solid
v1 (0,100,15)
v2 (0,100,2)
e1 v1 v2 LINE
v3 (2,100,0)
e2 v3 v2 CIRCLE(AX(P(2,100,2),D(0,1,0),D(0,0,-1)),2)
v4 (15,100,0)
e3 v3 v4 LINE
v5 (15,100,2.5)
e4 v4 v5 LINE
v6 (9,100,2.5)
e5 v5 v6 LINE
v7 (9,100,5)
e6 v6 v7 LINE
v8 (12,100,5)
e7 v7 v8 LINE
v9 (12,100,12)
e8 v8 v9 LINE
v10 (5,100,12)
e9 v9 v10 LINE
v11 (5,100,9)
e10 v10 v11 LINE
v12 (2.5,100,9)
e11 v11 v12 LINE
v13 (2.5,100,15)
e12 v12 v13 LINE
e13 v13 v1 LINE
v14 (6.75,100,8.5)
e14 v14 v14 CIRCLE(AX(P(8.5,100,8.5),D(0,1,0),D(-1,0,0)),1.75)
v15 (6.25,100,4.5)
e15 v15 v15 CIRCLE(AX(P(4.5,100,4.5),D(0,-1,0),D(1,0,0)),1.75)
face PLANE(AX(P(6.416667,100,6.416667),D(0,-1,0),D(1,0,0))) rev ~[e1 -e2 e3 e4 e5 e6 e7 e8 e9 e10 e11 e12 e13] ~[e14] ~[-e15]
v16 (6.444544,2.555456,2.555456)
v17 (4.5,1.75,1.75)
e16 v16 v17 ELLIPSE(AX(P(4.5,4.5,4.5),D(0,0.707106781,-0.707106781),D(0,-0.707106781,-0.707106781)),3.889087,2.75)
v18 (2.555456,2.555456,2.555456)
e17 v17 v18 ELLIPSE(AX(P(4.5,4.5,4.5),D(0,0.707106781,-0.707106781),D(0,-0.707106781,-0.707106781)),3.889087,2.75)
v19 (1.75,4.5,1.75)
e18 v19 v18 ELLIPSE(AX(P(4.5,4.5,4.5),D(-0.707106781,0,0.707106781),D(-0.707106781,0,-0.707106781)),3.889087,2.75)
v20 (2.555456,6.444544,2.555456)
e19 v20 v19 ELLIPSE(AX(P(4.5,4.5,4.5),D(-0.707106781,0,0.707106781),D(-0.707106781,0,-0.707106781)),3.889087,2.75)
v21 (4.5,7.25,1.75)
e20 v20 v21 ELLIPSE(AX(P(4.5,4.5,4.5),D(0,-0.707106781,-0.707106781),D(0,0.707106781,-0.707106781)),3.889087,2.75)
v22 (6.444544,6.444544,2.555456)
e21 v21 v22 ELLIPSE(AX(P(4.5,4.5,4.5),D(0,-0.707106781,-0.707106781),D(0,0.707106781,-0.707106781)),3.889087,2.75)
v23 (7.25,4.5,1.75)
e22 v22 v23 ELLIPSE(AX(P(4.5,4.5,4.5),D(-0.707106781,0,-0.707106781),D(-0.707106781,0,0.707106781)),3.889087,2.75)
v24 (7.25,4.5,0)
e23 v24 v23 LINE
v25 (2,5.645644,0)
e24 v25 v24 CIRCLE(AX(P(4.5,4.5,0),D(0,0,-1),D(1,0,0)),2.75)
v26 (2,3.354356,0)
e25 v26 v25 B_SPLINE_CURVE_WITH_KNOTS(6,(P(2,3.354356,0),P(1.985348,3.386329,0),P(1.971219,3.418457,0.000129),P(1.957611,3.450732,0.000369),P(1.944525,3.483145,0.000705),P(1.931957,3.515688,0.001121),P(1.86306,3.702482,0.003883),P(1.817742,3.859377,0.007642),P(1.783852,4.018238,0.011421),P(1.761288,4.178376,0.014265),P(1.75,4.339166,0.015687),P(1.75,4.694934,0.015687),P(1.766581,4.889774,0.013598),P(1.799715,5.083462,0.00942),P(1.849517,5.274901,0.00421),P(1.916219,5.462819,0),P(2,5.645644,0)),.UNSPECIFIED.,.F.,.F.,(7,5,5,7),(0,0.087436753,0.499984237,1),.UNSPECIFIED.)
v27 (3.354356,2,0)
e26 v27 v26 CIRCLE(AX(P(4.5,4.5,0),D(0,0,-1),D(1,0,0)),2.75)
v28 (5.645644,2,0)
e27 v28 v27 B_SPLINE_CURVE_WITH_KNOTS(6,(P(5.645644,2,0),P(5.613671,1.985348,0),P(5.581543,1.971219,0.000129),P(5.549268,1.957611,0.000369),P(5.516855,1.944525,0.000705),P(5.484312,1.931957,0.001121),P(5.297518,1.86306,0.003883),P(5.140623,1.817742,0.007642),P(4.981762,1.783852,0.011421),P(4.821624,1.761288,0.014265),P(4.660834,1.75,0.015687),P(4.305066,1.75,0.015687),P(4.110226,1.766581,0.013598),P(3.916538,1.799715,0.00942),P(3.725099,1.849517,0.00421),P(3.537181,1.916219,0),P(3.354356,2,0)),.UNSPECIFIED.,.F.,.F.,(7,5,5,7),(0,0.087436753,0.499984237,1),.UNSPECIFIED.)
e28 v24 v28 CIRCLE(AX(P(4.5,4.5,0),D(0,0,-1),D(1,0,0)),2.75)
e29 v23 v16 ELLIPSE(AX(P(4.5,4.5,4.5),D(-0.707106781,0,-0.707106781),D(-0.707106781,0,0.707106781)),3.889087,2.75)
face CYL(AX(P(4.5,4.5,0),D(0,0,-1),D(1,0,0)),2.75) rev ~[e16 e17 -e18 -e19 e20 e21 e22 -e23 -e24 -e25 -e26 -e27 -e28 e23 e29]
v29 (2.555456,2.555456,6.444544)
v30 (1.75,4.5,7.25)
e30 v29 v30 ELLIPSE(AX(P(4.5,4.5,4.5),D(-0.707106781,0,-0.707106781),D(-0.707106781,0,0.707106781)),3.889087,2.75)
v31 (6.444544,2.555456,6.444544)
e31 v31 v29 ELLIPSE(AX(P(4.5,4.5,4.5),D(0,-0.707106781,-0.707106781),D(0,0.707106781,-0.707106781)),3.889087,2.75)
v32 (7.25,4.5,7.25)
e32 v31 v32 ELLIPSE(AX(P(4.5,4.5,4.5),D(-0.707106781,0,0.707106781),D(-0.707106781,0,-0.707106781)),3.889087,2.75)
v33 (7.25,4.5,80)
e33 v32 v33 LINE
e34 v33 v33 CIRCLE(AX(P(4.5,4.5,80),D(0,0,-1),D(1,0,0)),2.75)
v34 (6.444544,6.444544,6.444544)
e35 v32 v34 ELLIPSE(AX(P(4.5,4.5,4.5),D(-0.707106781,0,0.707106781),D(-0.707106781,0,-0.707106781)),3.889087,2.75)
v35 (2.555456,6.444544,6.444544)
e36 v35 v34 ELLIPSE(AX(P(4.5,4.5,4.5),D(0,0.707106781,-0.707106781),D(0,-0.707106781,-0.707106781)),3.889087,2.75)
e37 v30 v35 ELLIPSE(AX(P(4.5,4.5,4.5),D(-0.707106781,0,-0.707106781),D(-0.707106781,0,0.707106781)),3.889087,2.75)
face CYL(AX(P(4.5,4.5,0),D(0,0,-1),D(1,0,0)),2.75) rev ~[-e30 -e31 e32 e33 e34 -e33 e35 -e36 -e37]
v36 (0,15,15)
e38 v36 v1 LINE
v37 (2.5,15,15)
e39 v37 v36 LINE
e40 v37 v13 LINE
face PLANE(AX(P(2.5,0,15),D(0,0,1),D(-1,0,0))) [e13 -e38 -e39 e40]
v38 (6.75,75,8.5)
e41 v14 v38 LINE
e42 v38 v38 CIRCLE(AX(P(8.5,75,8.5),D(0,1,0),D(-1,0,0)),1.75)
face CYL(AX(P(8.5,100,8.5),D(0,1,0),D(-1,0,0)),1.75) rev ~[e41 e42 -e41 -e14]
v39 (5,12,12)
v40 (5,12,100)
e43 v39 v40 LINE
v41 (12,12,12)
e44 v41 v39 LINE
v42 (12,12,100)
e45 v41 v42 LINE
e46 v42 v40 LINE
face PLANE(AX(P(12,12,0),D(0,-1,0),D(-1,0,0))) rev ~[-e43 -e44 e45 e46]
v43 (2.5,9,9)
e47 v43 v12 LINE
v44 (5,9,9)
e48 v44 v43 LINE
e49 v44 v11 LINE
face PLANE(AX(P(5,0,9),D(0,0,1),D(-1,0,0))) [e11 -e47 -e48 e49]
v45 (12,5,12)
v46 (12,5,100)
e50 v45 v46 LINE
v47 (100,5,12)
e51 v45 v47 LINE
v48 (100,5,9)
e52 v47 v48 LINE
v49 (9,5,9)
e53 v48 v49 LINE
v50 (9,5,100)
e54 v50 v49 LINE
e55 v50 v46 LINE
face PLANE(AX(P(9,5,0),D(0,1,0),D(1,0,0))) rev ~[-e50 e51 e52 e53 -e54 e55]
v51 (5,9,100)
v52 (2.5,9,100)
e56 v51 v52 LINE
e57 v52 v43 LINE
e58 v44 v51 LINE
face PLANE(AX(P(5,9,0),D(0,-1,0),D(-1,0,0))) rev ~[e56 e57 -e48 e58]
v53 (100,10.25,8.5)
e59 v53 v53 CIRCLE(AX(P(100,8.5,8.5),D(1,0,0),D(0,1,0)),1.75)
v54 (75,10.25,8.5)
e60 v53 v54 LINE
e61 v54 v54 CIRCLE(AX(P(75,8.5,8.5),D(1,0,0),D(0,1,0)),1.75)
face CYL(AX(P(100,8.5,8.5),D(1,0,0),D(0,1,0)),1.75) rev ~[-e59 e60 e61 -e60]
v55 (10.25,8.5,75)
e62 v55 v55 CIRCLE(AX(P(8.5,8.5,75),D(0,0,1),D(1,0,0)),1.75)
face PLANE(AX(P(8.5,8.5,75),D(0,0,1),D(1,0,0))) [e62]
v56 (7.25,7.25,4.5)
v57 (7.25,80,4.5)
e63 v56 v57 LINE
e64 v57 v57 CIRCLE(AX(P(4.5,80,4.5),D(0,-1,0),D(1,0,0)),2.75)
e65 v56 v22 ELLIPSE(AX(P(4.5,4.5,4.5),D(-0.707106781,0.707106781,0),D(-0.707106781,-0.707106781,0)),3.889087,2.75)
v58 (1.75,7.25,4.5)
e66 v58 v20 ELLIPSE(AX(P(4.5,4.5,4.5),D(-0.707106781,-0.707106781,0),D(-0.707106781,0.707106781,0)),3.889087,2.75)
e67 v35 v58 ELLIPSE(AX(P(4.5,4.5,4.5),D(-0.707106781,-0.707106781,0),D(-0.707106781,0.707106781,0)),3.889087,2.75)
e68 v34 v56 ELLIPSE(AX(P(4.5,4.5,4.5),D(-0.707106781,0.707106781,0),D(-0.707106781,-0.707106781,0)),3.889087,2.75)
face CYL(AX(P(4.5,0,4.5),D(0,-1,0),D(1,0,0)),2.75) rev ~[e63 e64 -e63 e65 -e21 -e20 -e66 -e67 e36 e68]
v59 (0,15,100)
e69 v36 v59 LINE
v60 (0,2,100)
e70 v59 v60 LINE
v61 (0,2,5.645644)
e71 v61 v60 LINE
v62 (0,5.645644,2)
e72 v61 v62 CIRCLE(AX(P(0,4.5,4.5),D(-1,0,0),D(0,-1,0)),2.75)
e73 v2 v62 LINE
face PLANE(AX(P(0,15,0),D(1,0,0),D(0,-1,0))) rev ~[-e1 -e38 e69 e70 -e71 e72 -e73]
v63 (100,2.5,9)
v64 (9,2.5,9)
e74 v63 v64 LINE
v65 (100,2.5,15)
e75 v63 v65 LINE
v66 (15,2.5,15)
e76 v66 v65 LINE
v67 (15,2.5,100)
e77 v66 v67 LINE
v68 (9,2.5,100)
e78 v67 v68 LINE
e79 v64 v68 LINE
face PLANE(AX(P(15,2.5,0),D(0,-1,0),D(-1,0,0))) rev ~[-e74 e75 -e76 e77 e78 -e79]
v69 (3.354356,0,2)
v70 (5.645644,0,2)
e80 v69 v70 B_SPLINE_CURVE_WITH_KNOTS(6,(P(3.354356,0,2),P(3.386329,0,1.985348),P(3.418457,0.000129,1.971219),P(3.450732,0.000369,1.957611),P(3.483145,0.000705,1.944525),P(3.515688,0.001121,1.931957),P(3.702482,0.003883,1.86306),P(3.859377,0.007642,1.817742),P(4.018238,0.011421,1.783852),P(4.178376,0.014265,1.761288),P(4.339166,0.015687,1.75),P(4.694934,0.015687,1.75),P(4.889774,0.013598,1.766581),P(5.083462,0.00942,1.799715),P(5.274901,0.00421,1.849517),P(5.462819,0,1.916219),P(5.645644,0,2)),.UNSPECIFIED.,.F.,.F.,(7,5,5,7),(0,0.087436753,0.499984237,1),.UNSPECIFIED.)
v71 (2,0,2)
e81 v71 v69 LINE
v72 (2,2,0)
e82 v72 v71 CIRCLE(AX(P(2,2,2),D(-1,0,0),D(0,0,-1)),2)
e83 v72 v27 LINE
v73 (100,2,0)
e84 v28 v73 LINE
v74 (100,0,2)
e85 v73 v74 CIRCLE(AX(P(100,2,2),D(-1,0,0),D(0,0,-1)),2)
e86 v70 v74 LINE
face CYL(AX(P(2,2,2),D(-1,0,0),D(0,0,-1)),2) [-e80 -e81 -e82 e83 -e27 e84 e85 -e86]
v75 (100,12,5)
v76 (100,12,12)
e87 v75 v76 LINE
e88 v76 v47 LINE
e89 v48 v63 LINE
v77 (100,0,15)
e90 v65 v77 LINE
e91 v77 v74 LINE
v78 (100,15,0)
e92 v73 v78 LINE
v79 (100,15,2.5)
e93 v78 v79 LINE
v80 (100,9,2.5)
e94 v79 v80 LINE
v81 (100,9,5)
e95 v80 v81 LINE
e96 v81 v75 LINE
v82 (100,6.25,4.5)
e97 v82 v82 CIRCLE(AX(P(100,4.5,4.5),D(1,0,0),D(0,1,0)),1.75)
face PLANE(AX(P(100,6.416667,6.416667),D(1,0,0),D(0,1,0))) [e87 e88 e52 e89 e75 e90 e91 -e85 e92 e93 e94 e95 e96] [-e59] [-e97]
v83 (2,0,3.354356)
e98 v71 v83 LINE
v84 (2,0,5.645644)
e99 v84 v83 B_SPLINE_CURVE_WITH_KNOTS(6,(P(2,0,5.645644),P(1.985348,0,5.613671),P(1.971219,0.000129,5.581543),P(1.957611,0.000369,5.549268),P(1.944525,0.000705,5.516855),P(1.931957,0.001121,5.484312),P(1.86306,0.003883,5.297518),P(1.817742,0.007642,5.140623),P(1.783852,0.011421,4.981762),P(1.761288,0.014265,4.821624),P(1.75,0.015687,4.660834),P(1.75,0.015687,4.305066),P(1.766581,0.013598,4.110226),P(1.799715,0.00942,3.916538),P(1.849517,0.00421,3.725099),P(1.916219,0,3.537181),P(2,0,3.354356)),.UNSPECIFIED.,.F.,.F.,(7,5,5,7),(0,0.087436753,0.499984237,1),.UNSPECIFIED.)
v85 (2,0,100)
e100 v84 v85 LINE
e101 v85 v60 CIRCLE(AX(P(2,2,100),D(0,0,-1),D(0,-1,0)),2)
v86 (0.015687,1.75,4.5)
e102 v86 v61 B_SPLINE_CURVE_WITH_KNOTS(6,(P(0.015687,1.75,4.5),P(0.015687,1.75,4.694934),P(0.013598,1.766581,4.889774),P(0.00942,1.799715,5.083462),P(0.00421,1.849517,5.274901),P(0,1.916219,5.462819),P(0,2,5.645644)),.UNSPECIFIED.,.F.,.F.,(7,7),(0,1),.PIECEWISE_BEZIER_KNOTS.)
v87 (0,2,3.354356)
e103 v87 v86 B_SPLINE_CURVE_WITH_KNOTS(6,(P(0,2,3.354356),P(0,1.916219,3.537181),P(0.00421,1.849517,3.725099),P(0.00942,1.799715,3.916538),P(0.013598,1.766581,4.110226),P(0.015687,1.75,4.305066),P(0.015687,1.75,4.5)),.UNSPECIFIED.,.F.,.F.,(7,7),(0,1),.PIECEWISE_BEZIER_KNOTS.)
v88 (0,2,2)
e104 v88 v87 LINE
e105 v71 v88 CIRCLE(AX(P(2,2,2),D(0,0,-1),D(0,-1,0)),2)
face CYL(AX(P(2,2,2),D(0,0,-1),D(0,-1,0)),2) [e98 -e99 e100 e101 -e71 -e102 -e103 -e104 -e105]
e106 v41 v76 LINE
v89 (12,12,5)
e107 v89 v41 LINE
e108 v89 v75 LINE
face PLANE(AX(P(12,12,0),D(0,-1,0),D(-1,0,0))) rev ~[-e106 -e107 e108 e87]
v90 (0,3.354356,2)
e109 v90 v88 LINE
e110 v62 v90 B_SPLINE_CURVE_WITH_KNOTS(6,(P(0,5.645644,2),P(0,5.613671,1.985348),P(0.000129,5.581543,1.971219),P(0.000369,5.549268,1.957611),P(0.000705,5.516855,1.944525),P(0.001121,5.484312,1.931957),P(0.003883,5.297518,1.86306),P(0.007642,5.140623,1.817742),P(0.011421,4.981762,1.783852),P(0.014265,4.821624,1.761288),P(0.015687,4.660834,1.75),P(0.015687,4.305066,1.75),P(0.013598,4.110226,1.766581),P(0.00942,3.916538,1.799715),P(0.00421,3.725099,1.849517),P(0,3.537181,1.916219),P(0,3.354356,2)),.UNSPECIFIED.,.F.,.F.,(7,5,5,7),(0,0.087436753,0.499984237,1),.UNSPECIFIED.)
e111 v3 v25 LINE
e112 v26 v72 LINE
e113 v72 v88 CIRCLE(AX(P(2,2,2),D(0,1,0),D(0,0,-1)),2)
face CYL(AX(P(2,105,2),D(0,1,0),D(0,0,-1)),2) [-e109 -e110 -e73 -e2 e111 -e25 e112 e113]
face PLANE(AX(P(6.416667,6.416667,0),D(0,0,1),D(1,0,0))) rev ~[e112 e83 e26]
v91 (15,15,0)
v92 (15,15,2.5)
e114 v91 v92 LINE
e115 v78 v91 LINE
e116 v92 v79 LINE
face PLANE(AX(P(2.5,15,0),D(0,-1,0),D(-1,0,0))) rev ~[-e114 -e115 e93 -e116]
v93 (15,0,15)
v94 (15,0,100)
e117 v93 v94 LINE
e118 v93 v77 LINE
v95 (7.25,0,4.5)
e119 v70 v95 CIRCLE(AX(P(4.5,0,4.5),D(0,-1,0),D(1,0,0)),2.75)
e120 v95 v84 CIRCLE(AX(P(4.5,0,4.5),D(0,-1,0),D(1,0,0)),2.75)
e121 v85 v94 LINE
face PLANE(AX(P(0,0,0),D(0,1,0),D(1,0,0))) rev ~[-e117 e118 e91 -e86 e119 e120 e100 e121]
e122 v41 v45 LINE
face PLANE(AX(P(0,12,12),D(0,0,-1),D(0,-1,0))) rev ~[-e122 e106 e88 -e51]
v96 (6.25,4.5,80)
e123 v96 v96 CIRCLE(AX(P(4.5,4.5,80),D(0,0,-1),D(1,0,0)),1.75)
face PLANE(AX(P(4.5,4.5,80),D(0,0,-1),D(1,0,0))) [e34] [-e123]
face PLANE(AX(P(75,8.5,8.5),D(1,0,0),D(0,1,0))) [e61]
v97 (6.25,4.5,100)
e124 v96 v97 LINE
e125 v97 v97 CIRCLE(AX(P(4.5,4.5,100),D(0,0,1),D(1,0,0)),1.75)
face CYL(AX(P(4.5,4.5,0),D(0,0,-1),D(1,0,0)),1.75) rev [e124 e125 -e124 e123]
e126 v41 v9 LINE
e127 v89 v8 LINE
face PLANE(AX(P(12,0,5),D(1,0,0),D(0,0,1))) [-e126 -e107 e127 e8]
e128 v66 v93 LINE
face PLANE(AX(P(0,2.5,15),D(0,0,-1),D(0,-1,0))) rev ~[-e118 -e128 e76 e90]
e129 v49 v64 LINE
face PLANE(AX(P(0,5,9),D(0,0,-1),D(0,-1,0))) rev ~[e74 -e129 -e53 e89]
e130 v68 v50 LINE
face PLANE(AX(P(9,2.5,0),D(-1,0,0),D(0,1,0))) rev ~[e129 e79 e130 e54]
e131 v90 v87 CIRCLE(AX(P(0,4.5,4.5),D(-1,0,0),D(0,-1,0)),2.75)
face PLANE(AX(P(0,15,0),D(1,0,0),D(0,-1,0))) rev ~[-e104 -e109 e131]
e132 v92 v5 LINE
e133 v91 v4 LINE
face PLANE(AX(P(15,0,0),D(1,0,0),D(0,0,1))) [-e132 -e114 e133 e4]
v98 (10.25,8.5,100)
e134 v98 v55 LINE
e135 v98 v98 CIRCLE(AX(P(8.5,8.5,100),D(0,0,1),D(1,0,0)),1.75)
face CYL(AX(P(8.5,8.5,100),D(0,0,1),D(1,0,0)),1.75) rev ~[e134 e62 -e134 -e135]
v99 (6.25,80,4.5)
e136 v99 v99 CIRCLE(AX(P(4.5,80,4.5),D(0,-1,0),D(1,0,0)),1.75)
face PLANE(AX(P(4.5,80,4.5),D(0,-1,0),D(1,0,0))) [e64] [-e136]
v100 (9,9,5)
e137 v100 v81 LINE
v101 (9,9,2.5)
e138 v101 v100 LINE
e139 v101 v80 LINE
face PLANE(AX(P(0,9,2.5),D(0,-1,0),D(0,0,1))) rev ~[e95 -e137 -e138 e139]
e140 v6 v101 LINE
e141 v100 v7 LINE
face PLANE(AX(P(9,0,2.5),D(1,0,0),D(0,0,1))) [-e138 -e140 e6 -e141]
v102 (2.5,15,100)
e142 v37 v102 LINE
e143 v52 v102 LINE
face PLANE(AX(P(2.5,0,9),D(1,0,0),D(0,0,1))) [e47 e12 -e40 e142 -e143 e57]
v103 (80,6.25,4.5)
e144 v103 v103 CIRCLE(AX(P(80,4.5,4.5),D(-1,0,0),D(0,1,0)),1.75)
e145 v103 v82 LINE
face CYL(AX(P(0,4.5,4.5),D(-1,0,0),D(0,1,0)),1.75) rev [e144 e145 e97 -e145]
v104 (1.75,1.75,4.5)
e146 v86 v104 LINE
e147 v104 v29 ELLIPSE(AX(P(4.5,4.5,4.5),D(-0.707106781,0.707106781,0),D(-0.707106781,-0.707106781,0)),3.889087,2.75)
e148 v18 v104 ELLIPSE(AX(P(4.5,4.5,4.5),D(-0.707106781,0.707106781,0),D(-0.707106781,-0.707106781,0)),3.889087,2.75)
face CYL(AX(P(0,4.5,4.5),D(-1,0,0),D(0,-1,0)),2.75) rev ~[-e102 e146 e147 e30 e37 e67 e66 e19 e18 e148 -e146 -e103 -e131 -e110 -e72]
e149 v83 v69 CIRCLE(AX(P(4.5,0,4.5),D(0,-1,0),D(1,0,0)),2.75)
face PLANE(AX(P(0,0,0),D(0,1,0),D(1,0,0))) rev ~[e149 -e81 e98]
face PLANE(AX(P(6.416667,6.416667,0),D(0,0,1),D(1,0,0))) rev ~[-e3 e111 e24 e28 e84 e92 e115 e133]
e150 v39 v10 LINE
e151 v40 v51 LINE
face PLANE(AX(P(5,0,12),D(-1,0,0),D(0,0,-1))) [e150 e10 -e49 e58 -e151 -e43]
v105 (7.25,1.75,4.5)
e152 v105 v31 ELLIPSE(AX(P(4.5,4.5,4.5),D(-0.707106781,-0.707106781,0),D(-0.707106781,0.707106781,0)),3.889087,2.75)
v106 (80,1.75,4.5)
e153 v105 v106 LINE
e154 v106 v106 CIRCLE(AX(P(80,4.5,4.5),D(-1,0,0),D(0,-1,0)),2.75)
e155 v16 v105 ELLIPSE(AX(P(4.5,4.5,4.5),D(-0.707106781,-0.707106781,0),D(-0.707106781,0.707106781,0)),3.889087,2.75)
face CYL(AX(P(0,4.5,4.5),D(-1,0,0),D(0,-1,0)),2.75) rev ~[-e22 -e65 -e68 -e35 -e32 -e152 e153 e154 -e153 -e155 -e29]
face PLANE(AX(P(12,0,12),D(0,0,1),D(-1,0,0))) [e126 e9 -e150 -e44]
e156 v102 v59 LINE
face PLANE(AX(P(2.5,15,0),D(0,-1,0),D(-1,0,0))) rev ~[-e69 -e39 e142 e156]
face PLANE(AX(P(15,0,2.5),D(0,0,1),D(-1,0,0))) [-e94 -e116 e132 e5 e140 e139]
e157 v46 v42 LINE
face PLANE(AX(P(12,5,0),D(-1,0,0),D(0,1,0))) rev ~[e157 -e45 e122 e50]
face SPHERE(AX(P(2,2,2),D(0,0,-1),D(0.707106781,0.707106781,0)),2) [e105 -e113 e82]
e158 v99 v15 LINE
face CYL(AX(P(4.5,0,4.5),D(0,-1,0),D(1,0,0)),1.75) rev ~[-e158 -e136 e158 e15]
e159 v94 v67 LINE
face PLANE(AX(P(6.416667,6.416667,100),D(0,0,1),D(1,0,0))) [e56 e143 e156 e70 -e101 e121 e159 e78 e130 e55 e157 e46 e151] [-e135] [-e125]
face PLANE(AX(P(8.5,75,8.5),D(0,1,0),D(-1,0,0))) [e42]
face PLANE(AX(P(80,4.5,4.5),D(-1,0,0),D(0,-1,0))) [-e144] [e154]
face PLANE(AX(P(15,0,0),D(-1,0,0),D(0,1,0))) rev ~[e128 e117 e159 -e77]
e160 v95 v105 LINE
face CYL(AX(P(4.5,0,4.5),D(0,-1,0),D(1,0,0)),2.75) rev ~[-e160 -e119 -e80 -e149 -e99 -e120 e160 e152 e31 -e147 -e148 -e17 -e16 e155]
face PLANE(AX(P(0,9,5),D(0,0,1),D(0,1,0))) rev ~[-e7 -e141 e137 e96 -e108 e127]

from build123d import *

# Parameters (mm, degrees)
F0_R          = 1.75
F1_DEPTH      = 100
F2_R          = 1.75
F3_DEPTH      = 100
F4_R          = 1.75
F5_DEPTH      = 100
F6_DEPTH      = 3
F7_DEPTH      = 3
F8_DEPTH      = 3
F9_R          = 2.75
F10_DEPTH     = 80
F11_R         = 2.75
F12_DEPTH     = 80
F13_R         = 2.75
F14_DEPTH     = 80
F15_T1_DEPTH  = 103
F15_T3_DEPTH  = 103
F15_T5_DEPTH  = 103
F15_S9_W      = 2
F15_S9_H      = 2
F15_T10_DEPTH = 2
F16_R         = 1.75
F17_DEPTH     = 25
F18_R         = 1.75
F19_DEPTH     = 25
F20_R         = 1.75
F21_DEPTH     = 25


# Not quite as in the source:
# - a fillet or chamfer that OpenCascade refuses, or shapes differently, is made with other operations: its cross-section is extruded or revolved along the edge and cut away or added


with BuildPart() as f1:
    # F0 (on Top) → F1 (new body)
    with BuildSketch(Plane.XY):
        Polygon((2.5, 15), (0, 15), (0, 0), (15, 0), (15, 2.5), (9, 2.5), (9, 5), (12, 5), (12, 12), (5, 12), (5, 9), (2.5, 9), align=None)
        with Locations((4.5, 4.5)):
            Circle(F0_R, mode=Mode.SUBTRACT)
    extrude(amount=F1_DEPTH)

    # F2 (on Right) → F3 (join)
    with BuildSketch(Plane.YZ):
        Polygon((2.5, 15), (0, 15), (0, 0), (15, 0), (15, 2.5), (9, 2.5), (9, 5), (12, 5), (12, 12), (5, 12), (5, 9), (2.5, 9), align=None)
        with Locations((4.5, 4.5)):
            Circle(F2_R, mode=Mode.SUBTRACT)
    extrude(amount=F3_DEPTH)

    # F4 (on Front) → F5 (join)
    with BuildSketch(Plane.XZ):
        Polygon((2.5, 15), (0, 15), (0, 0), (15, 0), (15, 2.5), (9, 2.5), (9, 5), (12, 5), (12, 12), (5, 12), (5, 9), (2.5, 9), align=None)
        with Locations((4.5, 4.5)):
            Circle(F4_R, mode=Mode.SUBTRACT)
    extrude(amount=-F5_DEPTH)

    # F6 (cut): a face of the model
    f6_faces = [f1.faces().sort_by_distance(p)[0] for p in [
        (3.75, 12, 10.5),
    ]]
    extrude(f6_faces, amount=-F6_DEPTH, mode=Mode.SUBTRACT)

    # F7 (cut): a face of the model
    f7_faces = [f1.faces().sort_by_distance(p)[0] for p in [
        (12, 3.75, 10.5),
    ]]
    extrude(f7_faces, amount=-F7_DEPTH, mode=Mode.SUBTRACT)

    # F8 (cut): a face of the model
    f8_faces = [f1.faces().sort_by_distance(p)[0] for p in [
        (12, 10.5, 3.75),
    ]]
    extrude(f8_faces, amount=-F8_DEPTH, mode=Mode.SUBTRACT)

    # F9 (on face) → F10 (cut)
    with BuildSketch(Plane(origin=(0, 0, 0), x_dir=(0, -1, 0), z_dir=(-1, 0, 0))):
        with Locations((-4.5, 4.5)):
            Circle(F9_R)
    extrude(amount=-F10_DEPTH, mode=Mode.SUBTRACT)

    # F11 (on face) → F12 (cut)
    with BuildSketch(Plane(origin=(0, 0, 0), x_dir=(1, 0, 0), z_dir=(0, 0, -1))):
        with Locations((4.5, -4.5)):
            Circle(F11_R)
    extrude(amount=-F12_DEPTH, mode=Mode.SUBTRACT)

    # F13 (on face) → F14 (cut)
    with BuildSketch(Plane.XZ):
        with Locations((4.5, 4.5)):
            Circle(F13_R)
    extrude(amount=-F14_DEPTH, mode=Mode.SUBTRACT)

    # F15: fillet of radius 2 on 3 edges, made by hand

    # F15_s2 → F15_t1 (cut)
    with BuildSketch(Plane.XZ.offset(-105)):
        with BuildLine():
            ThreePointArc((2, 0), (0.5857864376, 0.5857864376), (0, 2))
            Line((0, 2), (0, 0))
            Line((0, 0), (2, 0))
        make_face()
    extrude(amount=F15_T1_DEPTH, mode=Mode.SUBTRACT)

    # F15_s4 → F15_t3 (cut)
    with BuildSketch(Plane.YZ.offset(2)):
        with BuildLine():
            ThreePointArc((2, 0), (0.5857864376, 0.5857864376), (0, 2))
            Line((0, 2), (0, 0))
            Line((0, 0), (2, 0))
        make_face()
    extrude(amount=F15_T3_DEPTH, mode=Mode.SUBTRACT)

    # F15_s6 → F15_t5 (cut)
    with BuildSketch(Plane.XY.offset(2)):
        with BuildLine():
            ThreePointArc((2, 0), (0.5857864376, 0.5857864376), (0, 2))
            Line((0, 2), (0, 0))
            Line((0, 0), (2, 0))
        make_face()
    extrude(amount=F15_T5_DEPTH, mode=Mode.SUBTRACT)


with BuildPart() as f15_tool8:
    # F15_s9 → F15_t10 (new body)
    with BuildSketch(Plane.XY.offset(2)):
        with Locations((1, 1)):
            Rectangle(F15_S9_W, F15_S9_H)
    extrude(amount=-F15_T10_DEPTH)

    # F15_s11 → F15_t12 (revolve, cut)
    with BuildSketch(Plane(origin=(2, 2, 2), x_dir=(0.7071067812, 0.7071067812, 0), z_dir=(-0.7071067812, 0.7071067812, 0))):
        with BuildLine():
            ThreePointArc((0, -2), (2, 0), (0, 2))
            Line((0, 2), (0, -2))
        make_face()
    revolve(axis=Axis((2, 2, 2), (0, 0, -1)), mode=Mode.SUBTRACT)


with BuildPart() as f1_1:
    add(f1.part)

    # F15_t7: cut F15_tool8
    add(f15_tool8.part, mode=Mode.SUBTRACT)

    # F16 (on face) → F17 (cut)
    with BuildSketch(Plane.YZ.offset(100)):
        with Locations((8.5, 8.5)):
            Circle(F16_R)
    extrude(amount=-F17_DEPTH, mode=Mode.SUBTRACT)

    # F18 (on face) → F19 (cut)
    with BuildSketch(Plane.XY.offset(100)):
        with Locations((8.5, 8.5)):
            Circle(F18_R)
    extrude(amount=-F19_DEPTH, mode=Mode.SUBTRACT)

    # F20 (on face) → F21 (cut)
    with BuildSketch(Plane(origin=(0, 100, 0), x_dir=(-1, 0, 0), z_dir=(0, 1, 0))):
        with Locations((-8.5, 8.5)):
            Circle(F20_R)
    extrude(amount=-F21_DEPTH, mode=Mode.SUBTRACT)


solid = f1_1.part
